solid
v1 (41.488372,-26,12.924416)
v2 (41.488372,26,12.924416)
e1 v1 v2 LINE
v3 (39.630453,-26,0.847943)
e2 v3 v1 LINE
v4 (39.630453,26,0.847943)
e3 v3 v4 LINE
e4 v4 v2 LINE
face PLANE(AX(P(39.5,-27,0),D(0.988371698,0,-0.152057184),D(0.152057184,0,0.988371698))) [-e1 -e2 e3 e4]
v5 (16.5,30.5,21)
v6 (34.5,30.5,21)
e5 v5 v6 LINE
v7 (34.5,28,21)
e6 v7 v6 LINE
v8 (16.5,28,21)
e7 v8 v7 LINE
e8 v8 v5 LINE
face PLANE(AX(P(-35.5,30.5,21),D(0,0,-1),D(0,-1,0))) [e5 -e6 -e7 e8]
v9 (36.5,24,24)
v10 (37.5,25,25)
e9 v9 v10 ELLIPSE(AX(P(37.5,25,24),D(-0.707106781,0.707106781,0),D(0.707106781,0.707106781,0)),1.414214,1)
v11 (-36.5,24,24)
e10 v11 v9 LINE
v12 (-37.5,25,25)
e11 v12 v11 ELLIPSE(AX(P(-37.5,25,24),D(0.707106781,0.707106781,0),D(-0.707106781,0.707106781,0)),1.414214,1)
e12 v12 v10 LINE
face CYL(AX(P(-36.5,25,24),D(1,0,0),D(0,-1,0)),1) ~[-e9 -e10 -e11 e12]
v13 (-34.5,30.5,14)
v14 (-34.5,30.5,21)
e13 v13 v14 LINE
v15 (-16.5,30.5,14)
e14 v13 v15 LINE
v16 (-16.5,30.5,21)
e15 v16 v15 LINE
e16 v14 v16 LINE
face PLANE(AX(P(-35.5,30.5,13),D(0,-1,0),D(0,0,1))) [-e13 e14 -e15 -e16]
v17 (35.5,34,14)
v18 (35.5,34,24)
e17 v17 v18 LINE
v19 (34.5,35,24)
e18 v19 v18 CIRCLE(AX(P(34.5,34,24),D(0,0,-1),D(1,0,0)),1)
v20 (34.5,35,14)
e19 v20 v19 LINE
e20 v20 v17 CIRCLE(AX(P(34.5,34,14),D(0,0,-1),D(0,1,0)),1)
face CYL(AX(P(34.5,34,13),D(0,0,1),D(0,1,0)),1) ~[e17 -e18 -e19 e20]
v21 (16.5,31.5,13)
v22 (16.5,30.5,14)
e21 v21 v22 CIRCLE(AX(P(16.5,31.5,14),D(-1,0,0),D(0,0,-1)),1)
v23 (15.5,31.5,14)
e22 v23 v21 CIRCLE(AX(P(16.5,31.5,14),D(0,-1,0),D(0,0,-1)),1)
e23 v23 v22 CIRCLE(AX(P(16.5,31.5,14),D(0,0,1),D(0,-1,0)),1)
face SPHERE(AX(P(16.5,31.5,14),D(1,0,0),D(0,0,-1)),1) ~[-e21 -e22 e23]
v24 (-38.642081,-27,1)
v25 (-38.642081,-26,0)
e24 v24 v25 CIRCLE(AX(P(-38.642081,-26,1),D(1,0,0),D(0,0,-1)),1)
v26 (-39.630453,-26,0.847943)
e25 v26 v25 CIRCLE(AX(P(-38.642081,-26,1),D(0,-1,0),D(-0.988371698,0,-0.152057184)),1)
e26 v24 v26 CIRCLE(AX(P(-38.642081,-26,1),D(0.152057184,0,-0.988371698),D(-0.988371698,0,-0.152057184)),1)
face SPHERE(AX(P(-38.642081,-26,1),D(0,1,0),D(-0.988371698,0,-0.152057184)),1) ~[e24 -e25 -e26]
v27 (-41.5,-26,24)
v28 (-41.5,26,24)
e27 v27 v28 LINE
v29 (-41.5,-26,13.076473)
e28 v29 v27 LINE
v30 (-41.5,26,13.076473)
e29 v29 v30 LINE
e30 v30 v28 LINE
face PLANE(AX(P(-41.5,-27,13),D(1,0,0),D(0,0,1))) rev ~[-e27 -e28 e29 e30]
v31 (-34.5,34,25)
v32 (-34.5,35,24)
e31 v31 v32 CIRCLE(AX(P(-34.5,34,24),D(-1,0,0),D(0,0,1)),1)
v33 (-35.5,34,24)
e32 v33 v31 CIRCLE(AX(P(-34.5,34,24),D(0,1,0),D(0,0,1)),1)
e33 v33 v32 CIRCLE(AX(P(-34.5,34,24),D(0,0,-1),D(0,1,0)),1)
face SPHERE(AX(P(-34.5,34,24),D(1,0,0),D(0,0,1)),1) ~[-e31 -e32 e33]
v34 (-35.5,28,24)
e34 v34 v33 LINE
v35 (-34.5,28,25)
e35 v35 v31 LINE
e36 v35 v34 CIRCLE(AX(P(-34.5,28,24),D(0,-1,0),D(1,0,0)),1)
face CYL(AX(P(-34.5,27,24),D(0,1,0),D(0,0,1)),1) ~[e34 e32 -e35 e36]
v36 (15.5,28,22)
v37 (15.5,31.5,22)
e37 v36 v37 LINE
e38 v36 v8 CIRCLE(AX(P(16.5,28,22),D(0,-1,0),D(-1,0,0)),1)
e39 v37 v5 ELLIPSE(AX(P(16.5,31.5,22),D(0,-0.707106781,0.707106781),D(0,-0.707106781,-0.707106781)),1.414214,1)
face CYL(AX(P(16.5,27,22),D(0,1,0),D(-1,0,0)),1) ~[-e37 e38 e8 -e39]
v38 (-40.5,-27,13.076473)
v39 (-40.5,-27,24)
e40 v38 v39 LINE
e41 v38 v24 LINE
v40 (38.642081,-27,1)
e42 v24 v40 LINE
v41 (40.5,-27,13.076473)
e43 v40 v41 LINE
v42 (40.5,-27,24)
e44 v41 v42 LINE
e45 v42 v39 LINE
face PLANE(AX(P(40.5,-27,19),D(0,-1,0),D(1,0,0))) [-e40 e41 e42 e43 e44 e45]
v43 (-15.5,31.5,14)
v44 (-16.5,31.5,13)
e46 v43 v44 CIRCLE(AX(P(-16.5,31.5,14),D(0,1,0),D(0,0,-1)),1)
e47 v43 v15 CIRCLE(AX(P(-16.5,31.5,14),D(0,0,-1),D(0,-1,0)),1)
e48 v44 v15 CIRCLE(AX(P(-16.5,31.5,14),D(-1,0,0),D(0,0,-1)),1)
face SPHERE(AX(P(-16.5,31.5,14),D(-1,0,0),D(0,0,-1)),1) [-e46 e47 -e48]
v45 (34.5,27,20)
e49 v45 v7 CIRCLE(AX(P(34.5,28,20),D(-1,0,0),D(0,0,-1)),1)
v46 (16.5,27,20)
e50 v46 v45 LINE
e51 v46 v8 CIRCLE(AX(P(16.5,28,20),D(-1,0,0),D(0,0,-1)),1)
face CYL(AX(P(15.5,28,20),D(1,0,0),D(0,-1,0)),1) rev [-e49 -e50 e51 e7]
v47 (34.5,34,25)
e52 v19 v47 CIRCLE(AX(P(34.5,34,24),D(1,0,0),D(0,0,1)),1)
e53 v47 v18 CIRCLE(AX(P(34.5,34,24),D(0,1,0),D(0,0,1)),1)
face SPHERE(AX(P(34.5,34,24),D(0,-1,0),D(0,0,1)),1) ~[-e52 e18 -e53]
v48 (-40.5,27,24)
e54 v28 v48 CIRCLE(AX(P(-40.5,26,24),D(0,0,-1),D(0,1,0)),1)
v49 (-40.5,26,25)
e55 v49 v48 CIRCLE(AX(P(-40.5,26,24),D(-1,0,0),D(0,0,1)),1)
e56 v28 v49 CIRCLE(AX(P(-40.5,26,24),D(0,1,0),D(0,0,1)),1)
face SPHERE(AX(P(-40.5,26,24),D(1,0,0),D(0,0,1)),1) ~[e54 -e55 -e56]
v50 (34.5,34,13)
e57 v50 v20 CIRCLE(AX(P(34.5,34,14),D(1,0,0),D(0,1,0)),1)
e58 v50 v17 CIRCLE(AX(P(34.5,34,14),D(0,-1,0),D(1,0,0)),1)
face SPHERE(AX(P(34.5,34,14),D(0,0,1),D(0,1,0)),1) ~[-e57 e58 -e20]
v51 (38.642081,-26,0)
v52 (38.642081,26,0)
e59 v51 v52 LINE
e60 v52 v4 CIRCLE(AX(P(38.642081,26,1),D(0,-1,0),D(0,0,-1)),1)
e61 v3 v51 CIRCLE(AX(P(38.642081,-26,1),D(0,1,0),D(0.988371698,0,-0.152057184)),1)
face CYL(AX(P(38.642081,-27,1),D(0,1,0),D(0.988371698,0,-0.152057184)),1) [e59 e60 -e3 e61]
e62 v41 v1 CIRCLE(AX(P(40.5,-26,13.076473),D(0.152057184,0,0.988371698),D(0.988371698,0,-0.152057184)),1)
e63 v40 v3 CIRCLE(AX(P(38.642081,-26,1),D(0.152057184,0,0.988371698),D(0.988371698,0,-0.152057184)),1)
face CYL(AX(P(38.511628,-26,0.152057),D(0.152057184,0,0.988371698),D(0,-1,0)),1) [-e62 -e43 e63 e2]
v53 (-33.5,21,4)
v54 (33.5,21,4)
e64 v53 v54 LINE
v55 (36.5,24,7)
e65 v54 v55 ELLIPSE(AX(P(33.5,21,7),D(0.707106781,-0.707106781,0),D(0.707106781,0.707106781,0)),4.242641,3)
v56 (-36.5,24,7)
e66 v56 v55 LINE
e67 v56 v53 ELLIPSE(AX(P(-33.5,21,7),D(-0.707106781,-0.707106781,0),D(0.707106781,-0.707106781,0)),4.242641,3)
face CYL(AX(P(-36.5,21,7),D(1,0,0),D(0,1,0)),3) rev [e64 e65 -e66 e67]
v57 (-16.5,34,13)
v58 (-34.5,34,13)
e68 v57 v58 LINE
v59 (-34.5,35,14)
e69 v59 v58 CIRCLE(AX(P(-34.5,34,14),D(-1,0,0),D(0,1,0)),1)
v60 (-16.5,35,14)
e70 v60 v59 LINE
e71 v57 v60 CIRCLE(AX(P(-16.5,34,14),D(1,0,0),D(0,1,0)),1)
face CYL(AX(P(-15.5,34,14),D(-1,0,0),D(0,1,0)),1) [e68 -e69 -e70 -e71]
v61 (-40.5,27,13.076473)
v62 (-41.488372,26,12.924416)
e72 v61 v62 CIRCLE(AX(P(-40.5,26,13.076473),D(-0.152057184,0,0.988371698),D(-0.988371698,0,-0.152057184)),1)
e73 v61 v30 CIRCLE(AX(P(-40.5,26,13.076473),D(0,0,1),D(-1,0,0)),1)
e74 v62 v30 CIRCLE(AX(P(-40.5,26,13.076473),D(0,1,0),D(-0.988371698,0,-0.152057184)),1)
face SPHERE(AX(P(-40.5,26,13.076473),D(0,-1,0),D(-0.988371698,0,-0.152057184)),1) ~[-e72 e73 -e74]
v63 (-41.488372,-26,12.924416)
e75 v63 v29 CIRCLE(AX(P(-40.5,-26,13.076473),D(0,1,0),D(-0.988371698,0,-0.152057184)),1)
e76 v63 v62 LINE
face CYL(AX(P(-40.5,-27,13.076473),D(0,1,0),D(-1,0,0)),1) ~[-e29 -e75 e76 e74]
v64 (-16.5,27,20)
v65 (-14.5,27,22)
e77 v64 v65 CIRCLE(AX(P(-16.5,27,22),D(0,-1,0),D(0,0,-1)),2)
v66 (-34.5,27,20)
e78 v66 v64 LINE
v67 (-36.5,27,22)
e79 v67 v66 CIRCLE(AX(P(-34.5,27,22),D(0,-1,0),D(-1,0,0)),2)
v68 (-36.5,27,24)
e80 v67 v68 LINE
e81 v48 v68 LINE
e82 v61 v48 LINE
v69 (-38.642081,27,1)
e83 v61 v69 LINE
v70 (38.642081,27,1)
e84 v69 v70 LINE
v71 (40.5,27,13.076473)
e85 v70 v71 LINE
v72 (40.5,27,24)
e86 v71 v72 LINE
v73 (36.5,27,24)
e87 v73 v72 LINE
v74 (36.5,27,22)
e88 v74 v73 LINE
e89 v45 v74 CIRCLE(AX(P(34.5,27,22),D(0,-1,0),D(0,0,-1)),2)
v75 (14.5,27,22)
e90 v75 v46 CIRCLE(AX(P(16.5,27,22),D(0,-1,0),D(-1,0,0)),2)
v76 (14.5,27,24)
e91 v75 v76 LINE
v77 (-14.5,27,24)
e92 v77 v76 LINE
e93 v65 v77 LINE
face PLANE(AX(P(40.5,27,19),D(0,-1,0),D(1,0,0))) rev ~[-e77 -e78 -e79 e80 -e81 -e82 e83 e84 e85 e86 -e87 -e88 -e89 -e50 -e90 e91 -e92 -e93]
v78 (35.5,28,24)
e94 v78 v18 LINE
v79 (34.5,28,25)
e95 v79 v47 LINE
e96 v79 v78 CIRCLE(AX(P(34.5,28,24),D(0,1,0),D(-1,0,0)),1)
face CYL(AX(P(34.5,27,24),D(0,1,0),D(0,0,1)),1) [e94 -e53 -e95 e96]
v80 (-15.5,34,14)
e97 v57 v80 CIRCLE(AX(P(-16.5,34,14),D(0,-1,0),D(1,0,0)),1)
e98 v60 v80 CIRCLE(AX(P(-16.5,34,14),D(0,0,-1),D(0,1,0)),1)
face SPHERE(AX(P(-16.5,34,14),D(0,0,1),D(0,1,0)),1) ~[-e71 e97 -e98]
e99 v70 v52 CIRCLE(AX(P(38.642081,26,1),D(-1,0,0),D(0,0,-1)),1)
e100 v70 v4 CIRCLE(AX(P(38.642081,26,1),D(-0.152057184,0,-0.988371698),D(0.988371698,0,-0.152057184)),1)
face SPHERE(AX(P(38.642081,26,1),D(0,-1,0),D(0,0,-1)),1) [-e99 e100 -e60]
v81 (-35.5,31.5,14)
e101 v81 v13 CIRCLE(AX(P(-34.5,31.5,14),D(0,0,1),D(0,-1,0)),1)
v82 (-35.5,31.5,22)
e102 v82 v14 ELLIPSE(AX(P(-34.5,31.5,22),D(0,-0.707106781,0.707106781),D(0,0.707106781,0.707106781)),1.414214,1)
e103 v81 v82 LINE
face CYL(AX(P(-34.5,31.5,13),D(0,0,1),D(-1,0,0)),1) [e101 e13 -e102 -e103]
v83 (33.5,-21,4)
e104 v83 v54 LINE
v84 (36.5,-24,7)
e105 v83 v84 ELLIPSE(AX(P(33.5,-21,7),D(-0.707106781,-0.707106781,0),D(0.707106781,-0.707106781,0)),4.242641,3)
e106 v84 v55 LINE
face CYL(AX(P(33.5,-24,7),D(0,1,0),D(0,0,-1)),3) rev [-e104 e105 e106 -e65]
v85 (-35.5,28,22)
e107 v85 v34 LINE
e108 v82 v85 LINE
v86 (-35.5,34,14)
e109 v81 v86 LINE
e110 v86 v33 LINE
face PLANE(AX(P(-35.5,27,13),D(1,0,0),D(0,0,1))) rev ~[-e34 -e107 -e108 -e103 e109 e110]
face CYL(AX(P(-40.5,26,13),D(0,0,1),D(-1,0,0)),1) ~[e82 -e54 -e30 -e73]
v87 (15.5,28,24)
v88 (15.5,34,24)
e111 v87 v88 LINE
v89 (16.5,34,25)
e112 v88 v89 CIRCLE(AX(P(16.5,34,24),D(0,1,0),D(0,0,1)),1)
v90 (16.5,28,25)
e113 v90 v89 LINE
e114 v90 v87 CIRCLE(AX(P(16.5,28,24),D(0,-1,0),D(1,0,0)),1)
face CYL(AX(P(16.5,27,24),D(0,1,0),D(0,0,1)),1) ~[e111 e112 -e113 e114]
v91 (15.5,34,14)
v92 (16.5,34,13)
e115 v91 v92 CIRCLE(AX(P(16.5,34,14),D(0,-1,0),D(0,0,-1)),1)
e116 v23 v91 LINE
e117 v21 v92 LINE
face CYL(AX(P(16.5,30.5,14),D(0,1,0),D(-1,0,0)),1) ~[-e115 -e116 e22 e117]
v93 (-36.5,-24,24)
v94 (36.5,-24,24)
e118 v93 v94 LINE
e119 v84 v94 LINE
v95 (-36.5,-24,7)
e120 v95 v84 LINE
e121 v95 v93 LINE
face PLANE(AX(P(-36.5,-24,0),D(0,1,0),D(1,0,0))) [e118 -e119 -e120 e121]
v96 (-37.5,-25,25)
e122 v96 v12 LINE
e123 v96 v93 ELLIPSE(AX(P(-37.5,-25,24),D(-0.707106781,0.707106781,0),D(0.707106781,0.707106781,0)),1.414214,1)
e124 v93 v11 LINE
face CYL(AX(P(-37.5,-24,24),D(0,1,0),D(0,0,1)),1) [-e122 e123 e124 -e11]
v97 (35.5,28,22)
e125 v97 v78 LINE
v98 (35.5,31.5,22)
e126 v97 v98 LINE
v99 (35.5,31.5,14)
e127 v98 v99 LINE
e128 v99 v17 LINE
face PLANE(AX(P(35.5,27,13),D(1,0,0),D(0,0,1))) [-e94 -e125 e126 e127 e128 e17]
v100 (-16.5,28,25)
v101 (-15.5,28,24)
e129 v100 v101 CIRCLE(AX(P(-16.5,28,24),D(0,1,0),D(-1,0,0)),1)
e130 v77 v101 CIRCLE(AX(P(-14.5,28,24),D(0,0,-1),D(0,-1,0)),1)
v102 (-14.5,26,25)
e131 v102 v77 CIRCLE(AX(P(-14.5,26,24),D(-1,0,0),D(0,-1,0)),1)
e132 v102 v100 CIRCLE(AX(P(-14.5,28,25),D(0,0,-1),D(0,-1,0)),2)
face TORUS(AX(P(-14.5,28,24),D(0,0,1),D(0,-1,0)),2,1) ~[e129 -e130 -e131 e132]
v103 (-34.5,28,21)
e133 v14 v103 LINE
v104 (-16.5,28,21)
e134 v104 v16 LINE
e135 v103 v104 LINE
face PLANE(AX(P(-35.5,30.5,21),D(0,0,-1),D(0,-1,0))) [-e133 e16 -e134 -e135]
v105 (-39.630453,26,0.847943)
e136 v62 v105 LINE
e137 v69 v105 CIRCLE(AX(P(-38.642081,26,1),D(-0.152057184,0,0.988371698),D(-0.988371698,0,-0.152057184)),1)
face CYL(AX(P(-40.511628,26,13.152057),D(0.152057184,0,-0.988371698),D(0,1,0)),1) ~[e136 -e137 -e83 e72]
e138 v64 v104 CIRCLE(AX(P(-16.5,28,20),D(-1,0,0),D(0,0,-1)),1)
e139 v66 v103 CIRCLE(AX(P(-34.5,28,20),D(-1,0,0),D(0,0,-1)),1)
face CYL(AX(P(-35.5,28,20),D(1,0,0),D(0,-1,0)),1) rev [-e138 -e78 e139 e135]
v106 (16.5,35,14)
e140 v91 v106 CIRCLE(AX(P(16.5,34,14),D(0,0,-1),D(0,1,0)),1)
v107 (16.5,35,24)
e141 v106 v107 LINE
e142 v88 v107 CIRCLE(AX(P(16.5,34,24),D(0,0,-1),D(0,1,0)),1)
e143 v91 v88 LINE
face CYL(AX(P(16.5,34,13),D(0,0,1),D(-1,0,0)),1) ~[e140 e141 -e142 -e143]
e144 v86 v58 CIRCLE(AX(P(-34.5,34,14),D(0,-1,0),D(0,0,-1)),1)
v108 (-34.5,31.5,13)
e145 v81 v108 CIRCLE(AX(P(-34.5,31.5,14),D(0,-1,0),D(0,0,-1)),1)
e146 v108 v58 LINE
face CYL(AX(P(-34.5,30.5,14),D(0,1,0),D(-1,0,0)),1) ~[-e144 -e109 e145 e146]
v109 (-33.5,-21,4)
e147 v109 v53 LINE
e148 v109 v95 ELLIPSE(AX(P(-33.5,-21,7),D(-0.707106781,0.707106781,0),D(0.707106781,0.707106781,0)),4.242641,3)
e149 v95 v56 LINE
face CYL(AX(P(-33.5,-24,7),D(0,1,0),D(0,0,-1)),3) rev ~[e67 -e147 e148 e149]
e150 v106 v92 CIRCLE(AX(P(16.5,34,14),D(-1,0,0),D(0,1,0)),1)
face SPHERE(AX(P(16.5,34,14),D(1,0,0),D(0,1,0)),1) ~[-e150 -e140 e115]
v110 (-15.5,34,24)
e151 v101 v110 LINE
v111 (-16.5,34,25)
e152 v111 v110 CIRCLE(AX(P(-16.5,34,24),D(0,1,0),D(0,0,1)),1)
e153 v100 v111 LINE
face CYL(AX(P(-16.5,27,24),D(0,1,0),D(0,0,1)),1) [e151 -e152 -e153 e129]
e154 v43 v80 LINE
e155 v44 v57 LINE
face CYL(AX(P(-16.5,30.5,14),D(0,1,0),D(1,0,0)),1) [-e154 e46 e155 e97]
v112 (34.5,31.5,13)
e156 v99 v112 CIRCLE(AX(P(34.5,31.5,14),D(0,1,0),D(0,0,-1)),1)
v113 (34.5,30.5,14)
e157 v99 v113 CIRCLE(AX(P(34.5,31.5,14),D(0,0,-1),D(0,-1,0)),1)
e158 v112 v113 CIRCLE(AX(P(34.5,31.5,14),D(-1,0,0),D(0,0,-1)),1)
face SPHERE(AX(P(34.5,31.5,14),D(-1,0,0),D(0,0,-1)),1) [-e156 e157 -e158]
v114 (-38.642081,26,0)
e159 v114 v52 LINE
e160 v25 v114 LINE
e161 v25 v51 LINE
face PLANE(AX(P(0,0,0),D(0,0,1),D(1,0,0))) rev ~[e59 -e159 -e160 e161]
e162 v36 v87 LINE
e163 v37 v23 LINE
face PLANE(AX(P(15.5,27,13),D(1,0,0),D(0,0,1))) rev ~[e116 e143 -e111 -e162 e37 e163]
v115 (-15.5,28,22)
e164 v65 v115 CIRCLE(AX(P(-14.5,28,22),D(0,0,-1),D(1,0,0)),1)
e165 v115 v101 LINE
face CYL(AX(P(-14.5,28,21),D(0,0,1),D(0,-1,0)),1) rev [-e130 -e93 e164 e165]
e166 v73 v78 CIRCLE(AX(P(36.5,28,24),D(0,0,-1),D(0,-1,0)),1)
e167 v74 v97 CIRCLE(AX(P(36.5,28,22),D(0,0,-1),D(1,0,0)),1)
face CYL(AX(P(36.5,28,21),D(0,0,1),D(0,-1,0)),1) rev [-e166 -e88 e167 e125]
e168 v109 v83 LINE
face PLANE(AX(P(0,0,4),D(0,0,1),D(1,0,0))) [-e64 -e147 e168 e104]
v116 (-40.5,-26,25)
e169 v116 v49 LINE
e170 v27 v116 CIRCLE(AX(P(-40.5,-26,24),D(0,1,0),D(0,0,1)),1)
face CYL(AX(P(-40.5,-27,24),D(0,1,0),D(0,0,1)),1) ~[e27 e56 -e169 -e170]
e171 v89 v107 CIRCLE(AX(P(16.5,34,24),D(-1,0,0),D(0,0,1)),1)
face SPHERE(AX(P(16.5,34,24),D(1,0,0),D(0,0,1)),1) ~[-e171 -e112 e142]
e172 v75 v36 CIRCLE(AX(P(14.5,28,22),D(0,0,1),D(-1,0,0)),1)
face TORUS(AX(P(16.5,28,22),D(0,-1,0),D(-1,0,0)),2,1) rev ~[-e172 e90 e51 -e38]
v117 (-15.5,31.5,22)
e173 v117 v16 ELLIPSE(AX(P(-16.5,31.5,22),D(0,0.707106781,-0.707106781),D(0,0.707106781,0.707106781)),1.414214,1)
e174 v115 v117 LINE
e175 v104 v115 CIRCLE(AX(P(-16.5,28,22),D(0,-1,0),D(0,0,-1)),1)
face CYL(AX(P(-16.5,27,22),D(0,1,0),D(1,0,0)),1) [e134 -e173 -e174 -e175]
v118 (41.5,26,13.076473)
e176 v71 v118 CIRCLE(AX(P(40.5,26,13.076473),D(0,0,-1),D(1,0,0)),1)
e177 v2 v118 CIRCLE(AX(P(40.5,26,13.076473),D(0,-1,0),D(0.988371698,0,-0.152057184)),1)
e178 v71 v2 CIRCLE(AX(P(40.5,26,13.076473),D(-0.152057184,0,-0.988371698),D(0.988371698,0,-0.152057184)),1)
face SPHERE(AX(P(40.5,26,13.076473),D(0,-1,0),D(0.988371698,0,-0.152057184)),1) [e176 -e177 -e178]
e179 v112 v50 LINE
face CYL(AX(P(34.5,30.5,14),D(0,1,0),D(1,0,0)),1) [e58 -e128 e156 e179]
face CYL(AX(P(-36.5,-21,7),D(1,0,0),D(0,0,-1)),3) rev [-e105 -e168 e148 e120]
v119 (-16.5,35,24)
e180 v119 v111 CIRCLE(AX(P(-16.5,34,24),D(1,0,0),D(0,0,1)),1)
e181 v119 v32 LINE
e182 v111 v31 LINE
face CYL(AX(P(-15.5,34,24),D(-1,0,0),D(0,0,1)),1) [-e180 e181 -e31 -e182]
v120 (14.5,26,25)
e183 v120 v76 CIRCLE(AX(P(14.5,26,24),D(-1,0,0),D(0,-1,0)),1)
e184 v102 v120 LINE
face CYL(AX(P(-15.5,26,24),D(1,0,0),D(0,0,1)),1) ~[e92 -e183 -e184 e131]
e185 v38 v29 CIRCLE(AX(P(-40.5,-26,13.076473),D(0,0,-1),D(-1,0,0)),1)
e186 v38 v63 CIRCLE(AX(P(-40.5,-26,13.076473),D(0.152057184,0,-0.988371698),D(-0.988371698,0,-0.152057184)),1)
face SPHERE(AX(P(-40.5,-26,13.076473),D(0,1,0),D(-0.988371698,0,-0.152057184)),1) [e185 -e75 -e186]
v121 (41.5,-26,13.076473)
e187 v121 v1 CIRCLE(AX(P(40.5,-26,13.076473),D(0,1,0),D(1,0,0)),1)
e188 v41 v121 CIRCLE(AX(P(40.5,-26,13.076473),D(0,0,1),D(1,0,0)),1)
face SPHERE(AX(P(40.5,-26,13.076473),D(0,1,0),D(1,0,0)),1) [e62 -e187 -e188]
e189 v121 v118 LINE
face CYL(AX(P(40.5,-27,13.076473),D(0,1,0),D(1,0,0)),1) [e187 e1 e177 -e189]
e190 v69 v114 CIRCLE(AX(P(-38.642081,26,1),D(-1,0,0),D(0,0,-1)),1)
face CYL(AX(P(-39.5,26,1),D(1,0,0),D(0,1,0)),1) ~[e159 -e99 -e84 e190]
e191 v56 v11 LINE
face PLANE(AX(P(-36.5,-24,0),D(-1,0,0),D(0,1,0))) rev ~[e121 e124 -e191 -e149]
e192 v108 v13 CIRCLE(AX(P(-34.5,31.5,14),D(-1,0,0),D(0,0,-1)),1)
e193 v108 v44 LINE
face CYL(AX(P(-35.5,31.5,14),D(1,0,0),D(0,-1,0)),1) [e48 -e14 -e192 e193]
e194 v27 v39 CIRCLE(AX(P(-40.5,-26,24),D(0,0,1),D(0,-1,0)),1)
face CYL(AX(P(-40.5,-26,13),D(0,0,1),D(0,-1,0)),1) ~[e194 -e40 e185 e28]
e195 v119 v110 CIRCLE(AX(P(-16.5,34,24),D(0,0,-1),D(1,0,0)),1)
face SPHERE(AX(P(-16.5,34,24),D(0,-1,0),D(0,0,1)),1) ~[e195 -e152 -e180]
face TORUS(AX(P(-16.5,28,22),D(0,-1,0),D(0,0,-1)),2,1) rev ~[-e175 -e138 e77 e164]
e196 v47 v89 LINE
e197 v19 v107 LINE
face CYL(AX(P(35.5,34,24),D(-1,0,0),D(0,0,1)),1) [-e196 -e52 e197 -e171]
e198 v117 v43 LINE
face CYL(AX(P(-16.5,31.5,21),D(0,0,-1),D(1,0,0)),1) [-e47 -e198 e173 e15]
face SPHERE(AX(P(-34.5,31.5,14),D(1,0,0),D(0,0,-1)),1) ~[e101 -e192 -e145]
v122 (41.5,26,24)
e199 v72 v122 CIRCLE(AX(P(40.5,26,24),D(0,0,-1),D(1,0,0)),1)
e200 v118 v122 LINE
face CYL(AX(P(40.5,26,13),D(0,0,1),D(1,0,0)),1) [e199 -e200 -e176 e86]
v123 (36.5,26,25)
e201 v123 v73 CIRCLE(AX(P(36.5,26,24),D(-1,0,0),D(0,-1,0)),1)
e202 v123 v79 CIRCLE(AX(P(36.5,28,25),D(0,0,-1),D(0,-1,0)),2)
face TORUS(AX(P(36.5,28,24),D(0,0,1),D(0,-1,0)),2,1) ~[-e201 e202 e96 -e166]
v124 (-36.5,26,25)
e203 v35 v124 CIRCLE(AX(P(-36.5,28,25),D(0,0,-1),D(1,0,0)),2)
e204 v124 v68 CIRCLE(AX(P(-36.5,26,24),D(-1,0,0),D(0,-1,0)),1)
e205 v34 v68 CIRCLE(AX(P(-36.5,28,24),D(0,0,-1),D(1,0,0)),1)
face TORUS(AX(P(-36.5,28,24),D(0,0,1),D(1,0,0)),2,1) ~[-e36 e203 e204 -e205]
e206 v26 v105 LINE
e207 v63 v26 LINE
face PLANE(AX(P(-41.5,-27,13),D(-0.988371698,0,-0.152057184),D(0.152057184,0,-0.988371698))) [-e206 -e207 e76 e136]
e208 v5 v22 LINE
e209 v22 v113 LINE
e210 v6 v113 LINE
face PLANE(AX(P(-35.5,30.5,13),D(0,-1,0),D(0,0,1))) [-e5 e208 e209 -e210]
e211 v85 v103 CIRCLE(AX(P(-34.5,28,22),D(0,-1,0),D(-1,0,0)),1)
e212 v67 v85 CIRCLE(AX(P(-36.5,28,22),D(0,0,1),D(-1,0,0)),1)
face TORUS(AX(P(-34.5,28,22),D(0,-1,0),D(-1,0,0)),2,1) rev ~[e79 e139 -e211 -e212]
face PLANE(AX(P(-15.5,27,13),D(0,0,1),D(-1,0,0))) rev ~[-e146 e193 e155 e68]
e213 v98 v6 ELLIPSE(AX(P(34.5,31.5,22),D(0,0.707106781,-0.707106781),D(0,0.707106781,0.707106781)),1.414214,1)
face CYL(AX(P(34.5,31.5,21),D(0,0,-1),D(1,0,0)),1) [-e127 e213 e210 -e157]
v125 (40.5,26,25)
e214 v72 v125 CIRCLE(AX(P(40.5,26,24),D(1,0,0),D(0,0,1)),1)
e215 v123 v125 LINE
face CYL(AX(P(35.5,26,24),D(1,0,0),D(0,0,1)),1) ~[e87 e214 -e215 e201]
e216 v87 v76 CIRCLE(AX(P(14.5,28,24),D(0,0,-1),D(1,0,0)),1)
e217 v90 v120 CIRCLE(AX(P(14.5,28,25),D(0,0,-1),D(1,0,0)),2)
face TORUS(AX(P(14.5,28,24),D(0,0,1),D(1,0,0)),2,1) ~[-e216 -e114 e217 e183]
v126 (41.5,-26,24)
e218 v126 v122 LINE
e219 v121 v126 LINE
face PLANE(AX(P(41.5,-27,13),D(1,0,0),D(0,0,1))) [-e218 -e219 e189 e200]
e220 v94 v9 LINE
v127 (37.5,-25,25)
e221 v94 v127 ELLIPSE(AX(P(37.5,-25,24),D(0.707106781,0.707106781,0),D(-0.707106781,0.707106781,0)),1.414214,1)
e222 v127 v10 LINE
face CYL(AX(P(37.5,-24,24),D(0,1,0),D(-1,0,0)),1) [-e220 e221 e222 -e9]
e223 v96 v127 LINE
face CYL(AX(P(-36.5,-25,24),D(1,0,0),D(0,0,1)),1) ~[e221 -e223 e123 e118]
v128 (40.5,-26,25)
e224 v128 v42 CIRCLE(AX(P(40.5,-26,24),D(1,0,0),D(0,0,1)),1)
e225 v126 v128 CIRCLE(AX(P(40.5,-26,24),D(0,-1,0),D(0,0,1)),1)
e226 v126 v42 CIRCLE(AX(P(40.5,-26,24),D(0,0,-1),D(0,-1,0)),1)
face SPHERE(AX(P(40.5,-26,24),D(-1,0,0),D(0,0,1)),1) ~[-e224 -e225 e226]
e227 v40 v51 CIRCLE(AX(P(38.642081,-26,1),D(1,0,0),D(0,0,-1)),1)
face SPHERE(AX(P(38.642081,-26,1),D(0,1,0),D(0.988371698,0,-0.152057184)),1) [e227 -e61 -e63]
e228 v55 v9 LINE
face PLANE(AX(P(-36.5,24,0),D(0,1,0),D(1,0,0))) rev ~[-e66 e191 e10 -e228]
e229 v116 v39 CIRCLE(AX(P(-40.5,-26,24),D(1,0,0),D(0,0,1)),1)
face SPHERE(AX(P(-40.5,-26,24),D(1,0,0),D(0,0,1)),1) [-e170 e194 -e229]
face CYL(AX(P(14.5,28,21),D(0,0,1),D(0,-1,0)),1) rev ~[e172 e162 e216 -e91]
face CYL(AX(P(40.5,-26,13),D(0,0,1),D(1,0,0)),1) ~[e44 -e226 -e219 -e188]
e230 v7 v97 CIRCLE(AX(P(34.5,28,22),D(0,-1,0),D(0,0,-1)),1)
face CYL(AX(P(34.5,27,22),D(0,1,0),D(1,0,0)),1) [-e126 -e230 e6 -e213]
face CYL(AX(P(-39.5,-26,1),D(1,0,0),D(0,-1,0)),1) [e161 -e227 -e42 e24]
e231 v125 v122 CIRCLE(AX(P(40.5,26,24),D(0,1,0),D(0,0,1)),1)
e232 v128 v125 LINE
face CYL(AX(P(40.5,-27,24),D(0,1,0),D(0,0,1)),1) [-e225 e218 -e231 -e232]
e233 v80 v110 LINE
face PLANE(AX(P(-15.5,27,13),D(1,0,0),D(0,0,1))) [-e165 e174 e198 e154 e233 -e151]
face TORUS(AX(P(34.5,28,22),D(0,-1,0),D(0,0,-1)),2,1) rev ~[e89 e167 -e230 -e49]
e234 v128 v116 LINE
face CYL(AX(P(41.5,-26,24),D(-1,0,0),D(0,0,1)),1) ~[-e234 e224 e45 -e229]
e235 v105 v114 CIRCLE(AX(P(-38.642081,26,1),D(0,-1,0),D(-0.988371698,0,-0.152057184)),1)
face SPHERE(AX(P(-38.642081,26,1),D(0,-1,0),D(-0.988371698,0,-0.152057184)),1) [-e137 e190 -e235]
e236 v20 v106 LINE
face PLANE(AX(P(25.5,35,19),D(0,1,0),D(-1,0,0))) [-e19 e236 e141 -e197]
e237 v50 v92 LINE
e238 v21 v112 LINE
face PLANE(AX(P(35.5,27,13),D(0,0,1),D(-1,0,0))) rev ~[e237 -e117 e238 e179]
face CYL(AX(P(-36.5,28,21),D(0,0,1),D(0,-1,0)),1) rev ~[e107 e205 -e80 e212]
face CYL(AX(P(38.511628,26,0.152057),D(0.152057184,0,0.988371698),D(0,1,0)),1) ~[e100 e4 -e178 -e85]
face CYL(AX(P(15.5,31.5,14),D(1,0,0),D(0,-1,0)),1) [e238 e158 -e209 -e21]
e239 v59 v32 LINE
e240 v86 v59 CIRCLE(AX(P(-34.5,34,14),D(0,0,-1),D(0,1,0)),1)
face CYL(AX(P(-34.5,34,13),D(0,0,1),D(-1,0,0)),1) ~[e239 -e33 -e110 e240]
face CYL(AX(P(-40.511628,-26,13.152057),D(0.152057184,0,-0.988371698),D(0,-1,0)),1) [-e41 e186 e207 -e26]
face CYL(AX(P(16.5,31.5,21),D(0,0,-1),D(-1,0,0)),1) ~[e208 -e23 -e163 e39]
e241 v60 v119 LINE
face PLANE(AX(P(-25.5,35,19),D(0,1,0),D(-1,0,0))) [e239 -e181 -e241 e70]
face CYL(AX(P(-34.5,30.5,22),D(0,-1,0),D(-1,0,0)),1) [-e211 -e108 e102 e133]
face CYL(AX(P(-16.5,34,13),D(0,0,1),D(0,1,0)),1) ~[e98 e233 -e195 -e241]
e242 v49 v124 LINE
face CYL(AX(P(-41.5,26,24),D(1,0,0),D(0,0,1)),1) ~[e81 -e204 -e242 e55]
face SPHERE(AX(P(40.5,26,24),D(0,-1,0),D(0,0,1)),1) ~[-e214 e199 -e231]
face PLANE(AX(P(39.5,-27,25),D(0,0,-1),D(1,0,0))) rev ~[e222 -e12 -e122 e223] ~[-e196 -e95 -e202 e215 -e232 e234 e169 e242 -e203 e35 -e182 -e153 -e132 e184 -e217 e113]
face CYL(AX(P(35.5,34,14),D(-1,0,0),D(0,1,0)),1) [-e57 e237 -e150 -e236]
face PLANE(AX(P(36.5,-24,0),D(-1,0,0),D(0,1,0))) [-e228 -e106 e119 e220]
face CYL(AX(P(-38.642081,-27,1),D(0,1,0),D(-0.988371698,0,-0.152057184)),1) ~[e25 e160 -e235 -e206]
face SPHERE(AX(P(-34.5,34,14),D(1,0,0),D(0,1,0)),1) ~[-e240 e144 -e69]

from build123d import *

# Parameters (mm, degrees)
F0_W     = 73
F0_H     = 48
F1_DEPTH = 4
F0_W_2   = 79
F0_H_2   = 54
F2_DEPTH = 25
F3_W     = 2
F3_H     = 12
F4_DEPTH = 54
F5_W     = 20
F5_H     = 12
F6_DEPTH = 8
F7_W     = 3.5
F7_H     = 8
F8_DEPTH = 80
F9_R     = 3
F10_R    = 1


with BuildPart() as f1:
    # F0 (on Top) → F1 (new body)
    with BuildSketch(Plane.XY):
        Rectangle(F0_W, F0_H)
    extrude(amount=F1_DEPTH)

    # F0 (on Top) → F2 (join)
    with BuildSketch(Plane.XY):
        Rectangle(F0_W_2, F0_H_2)
        Rectangle(F0_W, F0_H, mode=Mode.SUBTRACT)
    extrude(amount=F2_DEPTH)

    # F3 (on face) → F4 (join)
    with BuildSketch(Plane.XZ.offset(27)):
        with Locations((40.5, 19)):
            Rectangle(F3_W, F3_H)
        Polygon((39.5, 13), (39.5, 0), (41.5, 13), align=None)
        with Locations((-40.5, 19)):
            Rectangle(F3_W, F3_H)
        Polygon((-41.5, 13), (-39.5, 0), (-39.5, 13), align=None)
    extrude(amount=-F4_DEPTH)

    # F5 (on face) → F6 (join)
    with BuildSketch(Plane(origin=(0, 27, 0), x_dir=(-1, 0, 0), z_dir=(0, 1, 0))):
        with Locations((-25.5, 19)):
            Rectangle(F5_W, F5_H)
        with Locations((25.5, 19)):
            Rectangle(F5_W, F5_H)
    extrude(amount=F6_DEPTH)

    # F7 (on face) → F8 (cut)
    with BuildSketch(Plane(origin=(-35.5, 0, 0), x_dir=(0, -1, 0), z_dir=(-1, 0, 0))):
        with Locations((-28.75, 17)):
            Rectangle(F7_W, F7_H)
    extrude(amount=-F8_DEPTH, mode=Mode.SUBTRACT)

    # F9
    f9_edges = [f1.edges().sort_by_distance(p)[0] for p in [
        (0, -24, 4),
        (36.5, 0, 4),
        (0, 24, 4),
        (-36.5, 0, 4),
    ]]
    fillet(f9_edges, radius=F9_R)

    # F10
    f10_edges = [f1.edges().sort_by_distance(p)[0] for p in [
        (0, -27, 25),
        (41.5, 0, 25),
        (38.5, 27, 25),
        (35.5, 31, 25),
        (25.5, 35, 25),
        (15.5, 31, 25),
        (0, 27, 25),
        (-15.5, 31, 25),
        (-25.5, 35, 25),
        (-35.5, 31, 25),
        (-38.5, 27, 25),
        (-41.5, 0, 25),
        (36.5, 0, 25),
        (0, -24, 25),
        (-36.5, 0, 25),
        (0, 24, 25),
        (0, -27, 0),
        (39.5, 0, 0),
        (0, 27, 0),
        (-39.5, 0, 0),
        (-40.5, -27, 6.5),
        (-41.5, -27, 19),
        (41.5, -27, 19),
        (40.5, -27, 6.5),
        (41.5, 0, 13),
        (40.5, 27, 6.5),
        (41.5, 27, 19),
        (-41.5, 0, 13),
        (-40.5, 27, 6.5),
        (-41.5, 27, 19),
        (-15.5, 35, 19),
        (-25.5, 35, 13),
        (-35.5, 35, 19),
        (35.5, 35, 19),
        (25.5, 35, 13),
        (15.5, 35, 19),
        (25.5, 30.5, 13),
        (15.5, 32.75, 13),
        (35.5, 32.75, 13),
        (-25.5, 30.5, 13),
        (-35.5, 32.75, 13),
        (-15.5, 32.75, 13),
        (-15.5, 27, 23),
        (-15.5, 28.75, 21),
        (-15.5, 30.5, 17),
        (35.5, 27, 23),
        (35.5, 28.75, 21),
        (35.5, 30.5, 17),
        (15.5, 30.5, 17),
        (15.5, 28.75, 21),
        (15.5, 27, 23),
        (-35.5, 30.5, 17),
        (-35.5, 28.75, 21),
        (-35.5, 27, 23),
        (25.5, 27, 21),
        (-25.5, 27, 21),
    ]]
    fillet(f10_edges, radius=F10_R)


solid = f1.part
